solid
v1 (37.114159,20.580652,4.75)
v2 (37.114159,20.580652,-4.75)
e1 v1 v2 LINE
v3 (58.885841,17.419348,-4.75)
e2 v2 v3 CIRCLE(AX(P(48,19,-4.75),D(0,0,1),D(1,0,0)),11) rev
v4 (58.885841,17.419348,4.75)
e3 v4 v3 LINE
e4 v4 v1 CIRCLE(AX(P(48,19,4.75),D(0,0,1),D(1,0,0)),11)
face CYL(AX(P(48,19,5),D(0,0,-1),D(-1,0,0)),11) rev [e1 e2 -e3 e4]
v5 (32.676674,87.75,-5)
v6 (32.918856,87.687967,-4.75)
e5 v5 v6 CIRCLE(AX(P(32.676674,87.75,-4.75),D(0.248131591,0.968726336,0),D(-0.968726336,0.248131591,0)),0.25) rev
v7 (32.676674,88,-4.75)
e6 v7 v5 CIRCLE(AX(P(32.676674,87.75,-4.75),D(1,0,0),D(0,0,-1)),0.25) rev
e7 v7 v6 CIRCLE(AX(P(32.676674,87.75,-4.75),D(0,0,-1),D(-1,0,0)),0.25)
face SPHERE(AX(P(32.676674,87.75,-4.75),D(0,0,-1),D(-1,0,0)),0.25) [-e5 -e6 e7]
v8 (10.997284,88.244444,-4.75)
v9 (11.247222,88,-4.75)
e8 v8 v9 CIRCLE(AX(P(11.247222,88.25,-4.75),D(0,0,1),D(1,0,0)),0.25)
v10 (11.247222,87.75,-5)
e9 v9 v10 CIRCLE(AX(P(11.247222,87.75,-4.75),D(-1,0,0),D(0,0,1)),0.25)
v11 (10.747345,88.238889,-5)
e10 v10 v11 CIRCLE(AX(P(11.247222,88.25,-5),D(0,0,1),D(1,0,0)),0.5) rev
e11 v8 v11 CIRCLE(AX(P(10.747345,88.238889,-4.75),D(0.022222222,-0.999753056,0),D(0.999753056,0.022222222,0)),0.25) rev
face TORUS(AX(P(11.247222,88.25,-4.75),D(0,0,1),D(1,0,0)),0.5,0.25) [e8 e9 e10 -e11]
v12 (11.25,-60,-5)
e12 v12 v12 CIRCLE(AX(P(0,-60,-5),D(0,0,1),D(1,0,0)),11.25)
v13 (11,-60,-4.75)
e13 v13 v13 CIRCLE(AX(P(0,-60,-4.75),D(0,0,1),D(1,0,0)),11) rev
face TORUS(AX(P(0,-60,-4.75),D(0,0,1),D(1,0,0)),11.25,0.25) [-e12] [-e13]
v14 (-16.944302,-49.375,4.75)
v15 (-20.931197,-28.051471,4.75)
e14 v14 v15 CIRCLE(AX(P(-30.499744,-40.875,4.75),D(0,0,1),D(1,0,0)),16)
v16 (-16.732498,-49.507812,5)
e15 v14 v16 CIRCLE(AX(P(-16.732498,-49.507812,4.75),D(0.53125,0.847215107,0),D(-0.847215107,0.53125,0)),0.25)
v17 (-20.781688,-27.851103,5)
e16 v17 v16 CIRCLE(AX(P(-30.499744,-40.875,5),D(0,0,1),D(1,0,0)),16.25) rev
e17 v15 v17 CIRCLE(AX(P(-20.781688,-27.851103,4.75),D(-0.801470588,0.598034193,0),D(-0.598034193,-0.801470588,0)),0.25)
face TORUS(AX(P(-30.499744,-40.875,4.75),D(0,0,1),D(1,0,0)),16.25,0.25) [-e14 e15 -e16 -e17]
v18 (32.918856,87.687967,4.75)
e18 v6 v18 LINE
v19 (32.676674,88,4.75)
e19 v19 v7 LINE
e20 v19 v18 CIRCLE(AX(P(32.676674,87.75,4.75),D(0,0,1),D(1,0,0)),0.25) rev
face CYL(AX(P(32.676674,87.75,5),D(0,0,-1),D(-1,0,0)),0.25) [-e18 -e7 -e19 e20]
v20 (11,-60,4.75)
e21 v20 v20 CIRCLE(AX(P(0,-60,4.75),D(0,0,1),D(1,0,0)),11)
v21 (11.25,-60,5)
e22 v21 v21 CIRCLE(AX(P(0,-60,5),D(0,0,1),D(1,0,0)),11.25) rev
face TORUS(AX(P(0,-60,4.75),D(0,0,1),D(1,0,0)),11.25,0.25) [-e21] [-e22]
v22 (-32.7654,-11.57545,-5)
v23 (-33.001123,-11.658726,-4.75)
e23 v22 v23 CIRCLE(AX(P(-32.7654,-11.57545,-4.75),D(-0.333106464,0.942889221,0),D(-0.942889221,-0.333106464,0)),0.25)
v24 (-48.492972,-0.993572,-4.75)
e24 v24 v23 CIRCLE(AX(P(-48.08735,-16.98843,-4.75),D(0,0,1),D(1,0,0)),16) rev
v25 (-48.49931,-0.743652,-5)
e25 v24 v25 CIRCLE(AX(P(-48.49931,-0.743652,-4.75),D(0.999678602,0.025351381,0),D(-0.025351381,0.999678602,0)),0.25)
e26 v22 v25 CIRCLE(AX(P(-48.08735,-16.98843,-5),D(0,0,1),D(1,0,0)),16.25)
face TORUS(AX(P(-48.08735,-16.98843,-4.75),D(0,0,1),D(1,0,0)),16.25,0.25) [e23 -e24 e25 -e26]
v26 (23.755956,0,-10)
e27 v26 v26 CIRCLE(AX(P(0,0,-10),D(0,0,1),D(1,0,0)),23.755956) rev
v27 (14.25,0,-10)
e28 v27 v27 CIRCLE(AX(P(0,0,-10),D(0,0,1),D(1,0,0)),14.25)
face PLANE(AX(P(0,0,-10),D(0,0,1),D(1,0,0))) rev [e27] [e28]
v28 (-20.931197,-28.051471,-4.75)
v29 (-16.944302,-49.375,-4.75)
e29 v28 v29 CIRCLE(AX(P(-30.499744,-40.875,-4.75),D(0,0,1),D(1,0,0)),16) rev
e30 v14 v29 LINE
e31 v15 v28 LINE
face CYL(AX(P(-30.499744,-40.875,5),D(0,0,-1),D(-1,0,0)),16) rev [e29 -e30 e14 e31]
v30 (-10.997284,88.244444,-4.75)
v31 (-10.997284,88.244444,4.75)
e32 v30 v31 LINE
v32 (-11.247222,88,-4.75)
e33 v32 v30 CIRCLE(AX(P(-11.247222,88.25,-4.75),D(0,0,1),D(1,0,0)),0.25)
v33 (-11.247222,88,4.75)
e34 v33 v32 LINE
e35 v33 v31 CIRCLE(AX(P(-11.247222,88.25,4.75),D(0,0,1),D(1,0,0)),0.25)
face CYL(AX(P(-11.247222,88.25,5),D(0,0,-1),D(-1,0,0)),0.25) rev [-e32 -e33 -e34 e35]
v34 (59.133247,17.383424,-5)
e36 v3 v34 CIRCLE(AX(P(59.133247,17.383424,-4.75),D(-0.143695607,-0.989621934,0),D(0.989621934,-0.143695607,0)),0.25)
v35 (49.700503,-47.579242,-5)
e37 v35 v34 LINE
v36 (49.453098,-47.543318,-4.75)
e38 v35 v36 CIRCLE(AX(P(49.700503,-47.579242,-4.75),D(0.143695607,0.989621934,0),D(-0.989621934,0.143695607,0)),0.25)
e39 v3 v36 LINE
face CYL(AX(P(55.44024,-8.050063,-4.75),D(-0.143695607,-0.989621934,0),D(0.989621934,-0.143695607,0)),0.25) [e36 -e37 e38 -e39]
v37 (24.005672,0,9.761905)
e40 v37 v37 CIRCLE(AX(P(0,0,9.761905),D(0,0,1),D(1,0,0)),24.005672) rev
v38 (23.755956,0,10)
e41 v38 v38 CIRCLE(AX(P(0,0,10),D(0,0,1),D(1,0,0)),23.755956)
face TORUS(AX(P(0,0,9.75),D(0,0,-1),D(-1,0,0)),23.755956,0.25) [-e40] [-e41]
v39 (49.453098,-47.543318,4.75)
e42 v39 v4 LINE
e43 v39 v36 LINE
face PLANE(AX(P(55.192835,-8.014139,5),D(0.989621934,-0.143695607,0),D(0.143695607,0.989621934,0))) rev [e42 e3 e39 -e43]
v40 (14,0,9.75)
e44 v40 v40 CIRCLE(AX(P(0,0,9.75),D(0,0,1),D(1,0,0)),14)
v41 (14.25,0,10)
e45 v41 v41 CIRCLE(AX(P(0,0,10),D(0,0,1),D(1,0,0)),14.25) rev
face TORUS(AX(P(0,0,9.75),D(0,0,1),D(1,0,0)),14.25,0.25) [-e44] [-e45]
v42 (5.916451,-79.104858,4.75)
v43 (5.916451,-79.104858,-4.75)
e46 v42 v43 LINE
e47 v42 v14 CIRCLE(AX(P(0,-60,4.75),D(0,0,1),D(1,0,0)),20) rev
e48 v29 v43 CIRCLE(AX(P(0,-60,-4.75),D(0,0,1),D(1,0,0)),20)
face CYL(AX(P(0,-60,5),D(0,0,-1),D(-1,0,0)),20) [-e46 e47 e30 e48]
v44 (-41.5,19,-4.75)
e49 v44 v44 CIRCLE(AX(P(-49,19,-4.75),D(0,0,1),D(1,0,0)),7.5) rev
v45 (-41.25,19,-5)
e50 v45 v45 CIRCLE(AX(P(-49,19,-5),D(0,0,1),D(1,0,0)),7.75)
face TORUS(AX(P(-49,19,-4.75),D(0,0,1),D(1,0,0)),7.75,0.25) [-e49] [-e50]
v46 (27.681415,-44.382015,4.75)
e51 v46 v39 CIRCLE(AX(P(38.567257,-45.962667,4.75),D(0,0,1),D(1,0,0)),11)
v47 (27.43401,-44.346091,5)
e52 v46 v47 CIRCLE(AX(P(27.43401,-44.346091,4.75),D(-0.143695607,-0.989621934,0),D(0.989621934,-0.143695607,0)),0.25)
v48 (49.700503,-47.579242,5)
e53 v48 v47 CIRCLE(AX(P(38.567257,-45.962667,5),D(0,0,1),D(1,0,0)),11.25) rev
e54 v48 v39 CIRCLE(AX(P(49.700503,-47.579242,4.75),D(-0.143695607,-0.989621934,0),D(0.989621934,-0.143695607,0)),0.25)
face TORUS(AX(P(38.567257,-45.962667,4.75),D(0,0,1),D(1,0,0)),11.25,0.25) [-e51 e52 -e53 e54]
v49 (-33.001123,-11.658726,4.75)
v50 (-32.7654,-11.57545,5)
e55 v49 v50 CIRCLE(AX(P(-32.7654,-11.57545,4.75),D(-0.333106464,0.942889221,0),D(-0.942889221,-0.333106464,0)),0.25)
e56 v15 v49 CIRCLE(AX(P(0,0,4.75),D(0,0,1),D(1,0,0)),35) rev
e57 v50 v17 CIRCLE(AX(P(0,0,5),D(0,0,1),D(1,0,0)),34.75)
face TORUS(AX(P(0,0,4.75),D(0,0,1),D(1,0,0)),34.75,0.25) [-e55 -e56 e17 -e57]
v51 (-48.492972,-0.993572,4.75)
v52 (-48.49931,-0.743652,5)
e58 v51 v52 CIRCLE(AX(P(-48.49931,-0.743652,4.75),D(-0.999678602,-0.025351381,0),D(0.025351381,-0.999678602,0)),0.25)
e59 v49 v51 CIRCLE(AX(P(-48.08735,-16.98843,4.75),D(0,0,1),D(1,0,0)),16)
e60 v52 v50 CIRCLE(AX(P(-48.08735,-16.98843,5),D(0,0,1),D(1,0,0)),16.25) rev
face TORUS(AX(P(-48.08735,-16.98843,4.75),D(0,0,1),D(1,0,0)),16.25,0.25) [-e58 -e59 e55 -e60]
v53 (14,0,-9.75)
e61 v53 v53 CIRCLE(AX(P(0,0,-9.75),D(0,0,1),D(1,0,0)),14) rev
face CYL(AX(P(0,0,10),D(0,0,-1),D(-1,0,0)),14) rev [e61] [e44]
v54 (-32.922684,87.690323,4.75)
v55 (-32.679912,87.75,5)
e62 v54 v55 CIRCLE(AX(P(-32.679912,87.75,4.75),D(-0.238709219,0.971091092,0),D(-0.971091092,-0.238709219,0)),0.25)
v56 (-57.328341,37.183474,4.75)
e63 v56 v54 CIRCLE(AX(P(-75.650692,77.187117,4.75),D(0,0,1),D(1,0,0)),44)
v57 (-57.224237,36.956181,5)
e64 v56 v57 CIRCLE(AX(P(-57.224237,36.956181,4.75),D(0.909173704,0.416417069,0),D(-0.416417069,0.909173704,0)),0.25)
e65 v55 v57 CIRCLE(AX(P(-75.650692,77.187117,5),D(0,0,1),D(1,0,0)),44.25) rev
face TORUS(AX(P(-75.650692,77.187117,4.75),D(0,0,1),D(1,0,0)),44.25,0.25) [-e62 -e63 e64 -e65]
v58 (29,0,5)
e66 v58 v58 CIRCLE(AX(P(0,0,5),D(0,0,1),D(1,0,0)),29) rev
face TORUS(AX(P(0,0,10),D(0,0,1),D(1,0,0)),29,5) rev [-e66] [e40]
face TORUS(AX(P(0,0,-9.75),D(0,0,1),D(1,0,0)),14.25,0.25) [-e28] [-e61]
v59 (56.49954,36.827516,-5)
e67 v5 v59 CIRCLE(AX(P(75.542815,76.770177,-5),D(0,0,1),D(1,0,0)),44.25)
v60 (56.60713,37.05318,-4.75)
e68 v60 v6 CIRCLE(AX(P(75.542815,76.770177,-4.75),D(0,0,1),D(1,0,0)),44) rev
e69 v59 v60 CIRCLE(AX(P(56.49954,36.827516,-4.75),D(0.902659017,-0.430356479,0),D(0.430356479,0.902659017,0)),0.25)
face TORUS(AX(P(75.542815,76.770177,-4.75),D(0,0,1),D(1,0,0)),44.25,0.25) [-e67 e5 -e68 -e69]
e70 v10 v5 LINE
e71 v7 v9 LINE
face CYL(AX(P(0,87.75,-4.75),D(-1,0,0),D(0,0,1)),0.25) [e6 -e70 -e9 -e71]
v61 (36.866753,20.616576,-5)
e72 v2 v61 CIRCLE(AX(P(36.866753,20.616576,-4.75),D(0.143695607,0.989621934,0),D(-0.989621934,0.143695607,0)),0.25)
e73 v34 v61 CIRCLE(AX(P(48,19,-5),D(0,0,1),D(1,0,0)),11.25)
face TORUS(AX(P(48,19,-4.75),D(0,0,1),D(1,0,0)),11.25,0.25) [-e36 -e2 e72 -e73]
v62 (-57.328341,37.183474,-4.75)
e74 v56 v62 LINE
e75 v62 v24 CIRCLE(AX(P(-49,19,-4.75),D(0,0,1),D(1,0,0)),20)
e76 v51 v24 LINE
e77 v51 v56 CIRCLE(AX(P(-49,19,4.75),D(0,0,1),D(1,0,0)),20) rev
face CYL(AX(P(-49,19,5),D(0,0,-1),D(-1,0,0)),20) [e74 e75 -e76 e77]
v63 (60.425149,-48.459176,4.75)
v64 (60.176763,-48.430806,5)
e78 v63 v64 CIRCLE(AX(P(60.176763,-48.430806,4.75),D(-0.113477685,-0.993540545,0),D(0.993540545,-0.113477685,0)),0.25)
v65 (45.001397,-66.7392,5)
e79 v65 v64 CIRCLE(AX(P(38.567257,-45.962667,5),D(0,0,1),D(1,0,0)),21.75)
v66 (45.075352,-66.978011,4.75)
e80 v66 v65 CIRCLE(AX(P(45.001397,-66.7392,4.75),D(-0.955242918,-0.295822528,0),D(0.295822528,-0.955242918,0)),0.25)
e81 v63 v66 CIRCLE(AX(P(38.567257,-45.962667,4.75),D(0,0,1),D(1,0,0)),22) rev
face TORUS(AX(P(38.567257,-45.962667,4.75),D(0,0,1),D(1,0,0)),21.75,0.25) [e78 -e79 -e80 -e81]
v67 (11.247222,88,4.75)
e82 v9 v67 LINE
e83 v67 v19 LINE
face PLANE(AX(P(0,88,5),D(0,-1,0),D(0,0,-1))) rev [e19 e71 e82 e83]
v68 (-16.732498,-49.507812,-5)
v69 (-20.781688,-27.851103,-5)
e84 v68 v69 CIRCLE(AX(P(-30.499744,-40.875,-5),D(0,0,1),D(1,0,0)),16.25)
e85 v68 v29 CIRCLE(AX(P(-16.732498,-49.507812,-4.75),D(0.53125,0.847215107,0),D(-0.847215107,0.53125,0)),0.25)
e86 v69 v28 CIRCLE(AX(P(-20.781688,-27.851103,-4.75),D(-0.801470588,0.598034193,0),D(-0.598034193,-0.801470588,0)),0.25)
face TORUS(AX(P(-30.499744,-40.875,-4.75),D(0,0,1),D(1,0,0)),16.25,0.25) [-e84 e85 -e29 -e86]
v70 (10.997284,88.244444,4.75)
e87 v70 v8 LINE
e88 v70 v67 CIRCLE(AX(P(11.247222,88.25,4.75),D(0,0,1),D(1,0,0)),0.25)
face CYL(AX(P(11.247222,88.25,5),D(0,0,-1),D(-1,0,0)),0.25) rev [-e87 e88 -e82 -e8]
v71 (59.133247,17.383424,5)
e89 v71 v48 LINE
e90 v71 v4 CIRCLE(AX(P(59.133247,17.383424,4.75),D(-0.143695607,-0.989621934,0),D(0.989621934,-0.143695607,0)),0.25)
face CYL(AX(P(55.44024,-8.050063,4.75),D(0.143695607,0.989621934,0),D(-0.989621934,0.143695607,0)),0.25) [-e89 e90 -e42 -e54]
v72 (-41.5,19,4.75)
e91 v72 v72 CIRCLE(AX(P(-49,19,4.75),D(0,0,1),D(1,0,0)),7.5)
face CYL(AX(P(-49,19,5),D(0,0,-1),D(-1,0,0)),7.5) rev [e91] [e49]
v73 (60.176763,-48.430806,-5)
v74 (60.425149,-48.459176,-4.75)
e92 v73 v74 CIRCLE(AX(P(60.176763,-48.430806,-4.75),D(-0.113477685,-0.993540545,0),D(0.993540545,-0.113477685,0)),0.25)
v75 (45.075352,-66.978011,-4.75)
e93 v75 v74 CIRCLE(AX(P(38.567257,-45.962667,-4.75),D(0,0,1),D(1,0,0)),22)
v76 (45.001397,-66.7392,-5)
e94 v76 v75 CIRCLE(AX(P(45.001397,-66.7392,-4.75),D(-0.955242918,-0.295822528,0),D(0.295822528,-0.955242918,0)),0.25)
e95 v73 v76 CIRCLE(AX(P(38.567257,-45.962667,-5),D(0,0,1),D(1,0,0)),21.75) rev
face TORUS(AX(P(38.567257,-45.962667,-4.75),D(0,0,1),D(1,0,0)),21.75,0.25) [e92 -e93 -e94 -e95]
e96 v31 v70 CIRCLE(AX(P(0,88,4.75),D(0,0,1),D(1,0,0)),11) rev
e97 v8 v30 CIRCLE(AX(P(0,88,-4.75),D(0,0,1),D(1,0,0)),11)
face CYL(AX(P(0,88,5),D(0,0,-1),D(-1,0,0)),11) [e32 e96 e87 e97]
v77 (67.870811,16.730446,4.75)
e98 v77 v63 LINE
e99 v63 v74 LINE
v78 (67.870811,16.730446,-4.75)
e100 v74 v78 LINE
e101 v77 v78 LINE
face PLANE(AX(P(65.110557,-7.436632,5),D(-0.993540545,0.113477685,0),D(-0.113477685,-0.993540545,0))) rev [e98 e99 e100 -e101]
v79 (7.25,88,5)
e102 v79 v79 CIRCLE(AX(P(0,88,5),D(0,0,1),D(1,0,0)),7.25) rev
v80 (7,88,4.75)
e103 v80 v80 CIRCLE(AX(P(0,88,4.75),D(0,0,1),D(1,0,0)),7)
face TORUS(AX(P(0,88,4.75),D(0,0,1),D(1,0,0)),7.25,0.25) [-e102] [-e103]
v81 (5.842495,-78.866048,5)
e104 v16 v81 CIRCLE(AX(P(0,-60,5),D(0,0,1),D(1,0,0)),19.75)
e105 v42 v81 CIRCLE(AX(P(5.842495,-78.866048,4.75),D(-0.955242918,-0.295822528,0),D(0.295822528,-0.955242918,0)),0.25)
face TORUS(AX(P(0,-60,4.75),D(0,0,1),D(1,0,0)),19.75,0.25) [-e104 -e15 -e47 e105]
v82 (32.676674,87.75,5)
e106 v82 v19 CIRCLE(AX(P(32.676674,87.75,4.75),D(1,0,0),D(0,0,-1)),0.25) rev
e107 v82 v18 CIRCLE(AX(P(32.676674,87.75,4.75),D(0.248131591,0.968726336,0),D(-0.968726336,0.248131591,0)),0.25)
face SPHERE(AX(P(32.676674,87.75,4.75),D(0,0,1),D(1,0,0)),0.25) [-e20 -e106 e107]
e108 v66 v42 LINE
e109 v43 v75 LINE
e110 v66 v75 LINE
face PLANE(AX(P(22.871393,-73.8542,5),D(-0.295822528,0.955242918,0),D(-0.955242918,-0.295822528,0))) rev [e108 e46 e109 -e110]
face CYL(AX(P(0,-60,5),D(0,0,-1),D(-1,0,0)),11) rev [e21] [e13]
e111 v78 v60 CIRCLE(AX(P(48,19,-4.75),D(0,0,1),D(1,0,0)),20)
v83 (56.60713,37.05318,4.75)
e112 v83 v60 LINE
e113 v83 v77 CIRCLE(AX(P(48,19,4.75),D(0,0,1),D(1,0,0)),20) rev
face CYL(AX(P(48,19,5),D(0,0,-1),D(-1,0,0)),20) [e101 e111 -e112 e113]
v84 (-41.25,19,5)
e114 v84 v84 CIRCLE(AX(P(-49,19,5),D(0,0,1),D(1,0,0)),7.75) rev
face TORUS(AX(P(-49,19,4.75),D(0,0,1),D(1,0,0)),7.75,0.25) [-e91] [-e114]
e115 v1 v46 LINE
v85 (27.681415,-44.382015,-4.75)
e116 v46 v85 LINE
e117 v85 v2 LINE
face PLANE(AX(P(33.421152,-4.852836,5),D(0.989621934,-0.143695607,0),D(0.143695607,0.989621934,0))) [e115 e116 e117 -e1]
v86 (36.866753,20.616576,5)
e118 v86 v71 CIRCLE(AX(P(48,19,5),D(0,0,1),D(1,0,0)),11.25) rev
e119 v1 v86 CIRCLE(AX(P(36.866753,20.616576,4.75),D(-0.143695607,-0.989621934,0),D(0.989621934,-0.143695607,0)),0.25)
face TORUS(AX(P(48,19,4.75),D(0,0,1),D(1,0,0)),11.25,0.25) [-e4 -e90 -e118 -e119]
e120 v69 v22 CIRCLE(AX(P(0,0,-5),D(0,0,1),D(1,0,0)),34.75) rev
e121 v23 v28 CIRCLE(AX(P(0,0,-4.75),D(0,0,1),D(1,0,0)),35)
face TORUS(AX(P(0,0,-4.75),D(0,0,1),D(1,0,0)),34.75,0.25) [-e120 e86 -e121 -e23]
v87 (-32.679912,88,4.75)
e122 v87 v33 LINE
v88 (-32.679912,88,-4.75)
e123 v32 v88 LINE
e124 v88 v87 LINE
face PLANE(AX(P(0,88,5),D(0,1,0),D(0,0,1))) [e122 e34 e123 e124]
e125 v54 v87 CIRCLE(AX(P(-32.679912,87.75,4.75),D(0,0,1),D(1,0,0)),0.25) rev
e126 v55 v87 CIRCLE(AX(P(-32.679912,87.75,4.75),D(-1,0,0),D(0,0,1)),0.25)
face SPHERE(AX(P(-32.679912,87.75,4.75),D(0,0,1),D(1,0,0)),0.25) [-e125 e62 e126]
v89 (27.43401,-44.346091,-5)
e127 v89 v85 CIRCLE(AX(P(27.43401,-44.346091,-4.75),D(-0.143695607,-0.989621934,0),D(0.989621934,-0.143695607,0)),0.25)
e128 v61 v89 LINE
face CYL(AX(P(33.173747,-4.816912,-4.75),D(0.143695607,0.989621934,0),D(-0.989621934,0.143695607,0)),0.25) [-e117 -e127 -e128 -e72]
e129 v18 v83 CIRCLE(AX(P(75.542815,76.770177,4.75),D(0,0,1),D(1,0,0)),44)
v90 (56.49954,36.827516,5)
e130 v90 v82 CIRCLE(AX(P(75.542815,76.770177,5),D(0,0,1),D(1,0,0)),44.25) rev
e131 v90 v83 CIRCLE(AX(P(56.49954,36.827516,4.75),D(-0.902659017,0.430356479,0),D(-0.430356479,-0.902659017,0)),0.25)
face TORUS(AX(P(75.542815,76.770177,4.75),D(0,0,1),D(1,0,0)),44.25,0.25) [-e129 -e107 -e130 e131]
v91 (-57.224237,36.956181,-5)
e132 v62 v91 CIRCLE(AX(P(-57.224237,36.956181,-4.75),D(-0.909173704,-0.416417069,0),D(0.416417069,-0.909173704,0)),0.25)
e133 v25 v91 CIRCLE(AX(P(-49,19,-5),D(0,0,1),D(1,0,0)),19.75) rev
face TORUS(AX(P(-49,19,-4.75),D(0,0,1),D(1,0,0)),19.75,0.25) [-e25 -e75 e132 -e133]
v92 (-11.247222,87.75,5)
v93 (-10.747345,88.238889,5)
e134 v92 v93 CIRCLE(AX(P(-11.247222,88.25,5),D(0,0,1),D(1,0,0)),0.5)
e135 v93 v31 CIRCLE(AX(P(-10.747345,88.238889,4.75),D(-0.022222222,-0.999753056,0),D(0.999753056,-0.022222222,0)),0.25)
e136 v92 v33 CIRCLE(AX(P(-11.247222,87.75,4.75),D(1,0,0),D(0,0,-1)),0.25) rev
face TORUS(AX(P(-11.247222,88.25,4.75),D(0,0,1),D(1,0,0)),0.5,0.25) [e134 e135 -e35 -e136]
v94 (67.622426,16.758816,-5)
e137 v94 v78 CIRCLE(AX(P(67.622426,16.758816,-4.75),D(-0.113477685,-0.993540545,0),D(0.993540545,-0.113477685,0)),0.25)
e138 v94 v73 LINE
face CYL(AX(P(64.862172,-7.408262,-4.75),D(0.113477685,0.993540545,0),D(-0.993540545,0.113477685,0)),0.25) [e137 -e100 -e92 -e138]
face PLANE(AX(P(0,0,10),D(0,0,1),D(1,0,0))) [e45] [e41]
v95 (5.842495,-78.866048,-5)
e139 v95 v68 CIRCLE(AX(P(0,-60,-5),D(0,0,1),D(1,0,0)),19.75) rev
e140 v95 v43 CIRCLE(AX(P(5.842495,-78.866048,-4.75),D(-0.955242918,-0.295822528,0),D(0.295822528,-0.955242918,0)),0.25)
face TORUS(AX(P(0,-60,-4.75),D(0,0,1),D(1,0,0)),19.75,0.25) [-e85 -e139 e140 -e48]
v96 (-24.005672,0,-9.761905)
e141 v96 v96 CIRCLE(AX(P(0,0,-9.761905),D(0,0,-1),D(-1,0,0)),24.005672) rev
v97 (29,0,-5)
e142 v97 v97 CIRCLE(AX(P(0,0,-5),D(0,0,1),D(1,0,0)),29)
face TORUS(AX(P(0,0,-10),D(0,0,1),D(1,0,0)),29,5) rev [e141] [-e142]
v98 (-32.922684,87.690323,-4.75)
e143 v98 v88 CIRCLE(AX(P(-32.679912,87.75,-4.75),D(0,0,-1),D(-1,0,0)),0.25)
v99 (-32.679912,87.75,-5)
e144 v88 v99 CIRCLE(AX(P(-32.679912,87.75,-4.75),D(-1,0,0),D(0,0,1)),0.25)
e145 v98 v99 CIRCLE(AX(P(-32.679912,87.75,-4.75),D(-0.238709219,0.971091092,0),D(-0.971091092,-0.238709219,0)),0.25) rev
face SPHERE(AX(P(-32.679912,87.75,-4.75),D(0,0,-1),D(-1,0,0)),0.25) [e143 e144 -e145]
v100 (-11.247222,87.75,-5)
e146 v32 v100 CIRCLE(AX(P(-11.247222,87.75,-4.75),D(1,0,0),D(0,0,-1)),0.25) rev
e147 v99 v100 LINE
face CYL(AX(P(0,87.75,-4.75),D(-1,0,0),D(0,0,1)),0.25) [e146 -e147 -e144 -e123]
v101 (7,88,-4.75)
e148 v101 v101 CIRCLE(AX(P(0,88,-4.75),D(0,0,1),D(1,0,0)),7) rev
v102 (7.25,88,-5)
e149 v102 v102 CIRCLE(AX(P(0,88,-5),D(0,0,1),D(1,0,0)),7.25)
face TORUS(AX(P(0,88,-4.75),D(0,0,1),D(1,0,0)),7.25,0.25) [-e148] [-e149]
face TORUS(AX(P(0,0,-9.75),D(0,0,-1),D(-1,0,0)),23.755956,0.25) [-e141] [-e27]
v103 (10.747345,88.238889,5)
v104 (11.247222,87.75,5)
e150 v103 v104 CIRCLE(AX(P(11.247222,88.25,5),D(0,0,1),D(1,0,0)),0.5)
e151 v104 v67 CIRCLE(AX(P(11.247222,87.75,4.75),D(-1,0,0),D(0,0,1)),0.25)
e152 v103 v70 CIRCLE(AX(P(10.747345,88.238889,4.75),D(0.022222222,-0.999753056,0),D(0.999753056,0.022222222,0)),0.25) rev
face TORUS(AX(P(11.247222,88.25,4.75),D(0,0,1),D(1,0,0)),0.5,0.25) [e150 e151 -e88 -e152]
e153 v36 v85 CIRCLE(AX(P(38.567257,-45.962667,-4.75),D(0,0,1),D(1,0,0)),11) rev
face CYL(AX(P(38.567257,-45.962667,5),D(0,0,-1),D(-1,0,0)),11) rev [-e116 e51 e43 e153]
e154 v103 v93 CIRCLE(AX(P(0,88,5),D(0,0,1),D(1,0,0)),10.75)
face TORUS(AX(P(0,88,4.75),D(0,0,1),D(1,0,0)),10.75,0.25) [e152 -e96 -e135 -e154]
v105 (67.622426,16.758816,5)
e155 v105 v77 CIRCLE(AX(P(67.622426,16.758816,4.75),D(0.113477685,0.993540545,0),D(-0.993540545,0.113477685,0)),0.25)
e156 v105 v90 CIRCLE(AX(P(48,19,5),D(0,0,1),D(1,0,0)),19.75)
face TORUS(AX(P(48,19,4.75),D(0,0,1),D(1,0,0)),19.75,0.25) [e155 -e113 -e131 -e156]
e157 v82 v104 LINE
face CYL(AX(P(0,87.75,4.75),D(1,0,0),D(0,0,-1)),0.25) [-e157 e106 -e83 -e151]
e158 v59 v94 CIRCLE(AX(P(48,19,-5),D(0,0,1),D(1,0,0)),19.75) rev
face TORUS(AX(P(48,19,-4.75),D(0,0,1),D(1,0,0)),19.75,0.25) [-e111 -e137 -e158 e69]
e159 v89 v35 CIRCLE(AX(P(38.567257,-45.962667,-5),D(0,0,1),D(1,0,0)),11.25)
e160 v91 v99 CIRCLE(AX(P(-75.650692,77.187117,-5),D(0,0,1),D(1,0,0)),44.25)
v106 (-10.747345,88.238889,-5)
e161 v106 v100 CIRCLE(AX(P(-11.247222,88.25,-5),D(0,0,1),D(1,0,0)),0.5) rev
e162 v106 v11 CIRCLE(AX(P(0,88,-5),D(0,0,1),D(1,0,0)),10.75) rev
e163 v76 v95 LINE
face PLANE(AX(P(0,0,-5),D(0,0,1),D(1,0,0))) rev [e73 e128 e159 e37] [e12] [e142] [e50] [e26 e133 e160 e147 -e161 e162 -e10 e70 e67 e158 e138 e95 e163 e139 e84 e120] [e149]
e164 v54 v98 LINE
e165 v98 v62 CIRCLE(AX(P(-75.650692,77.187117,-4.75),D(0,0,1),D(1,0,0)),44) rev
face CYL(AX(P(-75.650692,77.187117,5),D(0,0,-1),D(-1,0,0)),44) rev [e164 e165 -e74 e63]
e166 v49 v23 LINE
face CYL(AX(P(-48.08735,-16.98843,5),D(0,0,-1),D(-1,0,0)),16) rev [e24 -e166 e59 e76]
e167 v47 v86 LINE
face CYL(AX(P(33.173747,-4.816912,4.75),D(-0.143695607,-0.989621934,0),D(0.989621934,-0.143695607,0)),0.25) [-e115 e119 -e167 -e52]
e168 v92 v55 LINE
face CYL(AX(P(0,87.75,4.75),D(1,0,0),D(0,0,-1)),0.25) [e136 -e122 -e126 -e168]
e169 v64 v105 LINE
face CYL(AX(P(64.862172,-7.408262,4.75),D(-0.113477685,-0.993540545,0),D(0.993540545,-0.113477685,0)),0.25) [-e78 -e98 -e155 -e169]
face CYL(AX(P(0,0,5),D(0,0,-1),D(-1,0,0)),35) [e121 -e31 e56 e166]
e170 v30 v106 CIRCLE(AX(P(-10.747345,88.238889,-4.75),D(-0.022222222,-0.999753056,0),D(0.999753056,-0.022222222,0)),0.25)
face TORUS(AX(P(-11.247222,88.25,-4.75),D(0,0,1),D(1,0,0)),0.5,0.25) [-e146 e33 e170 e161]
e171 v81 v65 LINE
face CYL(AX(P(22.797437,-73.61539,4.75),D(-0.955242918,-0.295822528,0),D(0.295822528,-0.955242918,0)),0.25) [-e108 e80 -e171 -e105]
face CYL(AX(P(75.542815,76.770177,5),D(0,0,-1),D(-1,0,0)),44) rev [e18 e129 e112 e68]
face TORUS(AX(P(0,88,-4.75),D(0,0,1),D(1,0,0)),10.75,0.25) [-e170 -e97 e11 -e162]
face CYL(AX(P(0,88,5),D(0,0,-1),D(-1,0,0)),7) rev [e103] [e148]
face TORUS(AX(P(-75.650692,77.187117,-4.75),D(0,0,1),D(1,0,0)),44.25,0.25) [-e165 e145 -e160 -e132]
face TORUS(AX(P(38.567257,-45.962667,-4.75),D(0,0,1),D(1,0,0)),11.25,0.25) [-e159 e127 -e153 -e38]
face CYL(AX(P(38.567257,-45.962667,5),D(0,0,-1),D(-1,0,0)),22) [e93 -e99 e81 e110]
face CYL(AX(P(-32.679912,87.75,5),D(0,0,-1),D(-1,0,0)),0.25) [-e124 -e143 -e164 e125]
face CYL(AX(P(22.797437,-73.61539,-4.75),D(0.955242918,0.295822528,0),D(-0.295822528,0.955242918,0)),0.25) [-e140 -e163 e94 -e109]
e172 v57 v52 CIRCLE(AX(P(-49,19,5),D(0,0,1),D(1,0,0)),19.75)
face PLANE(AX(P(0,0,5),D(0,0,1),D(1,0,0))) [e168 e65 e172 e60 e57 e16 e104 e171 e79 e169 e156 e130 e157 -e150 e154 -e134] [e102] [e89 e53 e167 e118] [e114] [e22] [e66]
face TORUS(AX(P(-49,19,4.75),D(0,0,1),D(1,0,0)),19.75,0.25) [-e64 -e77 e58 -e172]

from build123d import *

# Parameters (mm, degrees)
SKETCH1_R           = 24
SKETCH1_R_2         = 14
EXTRUDE_THIN1_DEPTH = 10
SKETCH1_5_R         = 14
SKETCH1_5_R_2       = 7
SKETCH1_5_R_3       = 11
SKETCH1_5_R_4       = 7.5
BOSS_EXTRUDE2_DEPTH = 5
FILLET1_R           = 5
FILLET2_R           = 0.25


with BuildPart() as part:
    # Sketch1 → Extrude-Thin1 (new, symmetric)
    with BuildSketch(Plane.XY):
        Circle(SKETCH1_R)
        Circle(SKETCH1_R_2, mode=Mode.SUBTRACT)
    extrude(amount=EXTRUDE_THIN1_DEPTH, both=True)

    # Sketch1<5> → Boss-Extrude2 (add, symmetric)
    with BuildSketch(Plane.XY):
        with BuildLine():
            Line((60.425148575, -48.459175665), (67.870810904, 16.730446293))
            ThreePointArc((67.870810904, 16.730446293), (65.492902941, 28.695274452), (56.607129575, 37.053180342))
            ThreePointArc((56.607129575, 37.053180342), (35.620438837, 58.271422809), (33, 88))
            Line((33, 88), (11, 88))
            ThreePointArc((11, 88), (0, 99), (-11, 88))
            Line((-11, 88), (-33, 88))
            ThreePointArc((-33, 88), (-35.964324056, 58.187323214), (-57.328341378, 37.183474088))
            ThreePointArc((-57.328341378, 37.183474088), (-68.484992944, 14.490559903), (-48.492972379, -0.993572042))
            ThreePointArc((-48.492972379, -0.993572042), (-39.014510451, -3.809523143), (-33.001122743, -11.658726248))
            ThreePointArc((-33.001122743, -11.658726248), (-28.18429152, -20.752004999), (-20.931196761, -28.051470588))
            ThreePointArc((-20.931196761, -28.051470588), (-14.77228566, -37.934411824), (-16.94430214, -49.375))
            ThreePointArc((-16.94430214, -49.375), (-15.854636455, -72.191411029), (5.916450554, -79.104858357))
            Line((5.916450554, -79.104858357), (45.075352191, -66.97801078))
            ThreePointArc((45.075352191, -66.97801078), (55.505205887, -60.002106509), (60.425148575, -48.459175665))
        make_face()
        Circle(SKETCH1_5_R, mode=Mode.SUBTRACT)
        with Locations((0, 88)):
            Circle(SKETCH1_5_R_2, mode=Mode.SUBTRACT)
        with Locations((0, -60)):
            Circle(SKETCH1_5_R_3, mode=Mode.SUBTRACT)
        with Locations((-49, 19)):
            Circle(SKETCH1_5_R_4, mode=Mode.SUBTRACT)
        with BuildLine():
            ThreePointArc((27.681415305, -44.382014914), (36.986604908, -56.848507863), (49.453097857, -47.543318261))
            Line((49.453097857, -47.543318261), (58.885841276, 17.419348327))
            ThreePointArc((58.885841276, 17.419348327), (49.580651673, 29.885841276), (37.114158724, 20.580651673))
            Line((37.114158724, 20.580651673), (27.681415305, -44.382014914))
        make_face(mode=Mode.SUBTRACT)
    extrude(amount=BOSS_EXTRUDE2_DEPTH, both=True)

    # Fillet1
    fillet1_edges = [part.edges().sort_by_distance(p)[0] for p in [
        (-24, 0, -5),
        (-24, 0, 5),
    ]]
    fillet(fillet1_edges, radius=FILLET1_R - 0.0001)  # a hair under: the kernel refuses the full size

    # Fillet2
    fillet2_edges = [part.edges().sort_by_distance(p)[0] for p in [
        (64.147979739, -15.864364686, 5),
        (65.492902941, 28.695274452, 5),
        (22, 88, 5),
        (0, 99, 5),
        (-35.964324056, 58.187323214, 5),
        (-68.484992944, 14.490559903, 5),
        (-39.014510451, -3.809523143, 5),
        (-28.18429152, -20.752004999, 5),
        (-14.77228566, -37.934411824, 5),
        (-15.854636455, -72.191411029, 5),
        (25.495901372, -73.041434568, 5),
        (55.505205887, -60.002106509, 5),
        (54.169469567, -15.061984967, 5),
        (-22, 88, -5),
        (35.620438837, 58.271422809, -5),
        (36.986604908, -56.848507863, -5),
        (49.580651673, 29.885841276, -5),
        (32.397787015, -11.90068162, -5),
        (-56.5, 19, -5),
        (-11, -60, -5),
        (-7, 88, -5),
        (-24, 0, -10),
        (64.147979739, -15.864364686, -5),
        (65.492902941, 28.695274452, -5),
        (35.620438837, 58.271422809, 5),
        (22, 88, -5),
        (33, 88, 0),
        (0, 99, -5),
        (11, 88, 0),
        (-22, 88, 5),
        (-11, 88, 0),
        (-35.964324056, 58.187323214, -5),
        (-33, 88, 0),
        (-68.484992944, 14.490559903, -5),
        (-39.014510451, -3.809523143, -5),
        (-28.18429152, -20.752004999, -5),
        (-14.77228566, -37.934411824, -5),
        (-15.854636455, -72.191411029, -5),
        (25.495901372, -73.041434568, -5),
        (36.986604908, -56.848507863, 5),
        (32.397787015, -11.90068162, 5),
        (49.580651673, 29.885841276, 5),
        (54.169469567, -15.061984967, -5),
        (-56.5, 19, 5),
        (-11, -60, 5),
        (-7, 88, 5),
        (55.505205887, -60.002106509, -5),
        (-14, 0, -10),
        (-24, 0, 10),
        (-14, 0, 10),
    ]]
    fillet(fillet2_edges, radius=FILLET2_R)


solid = part.part
